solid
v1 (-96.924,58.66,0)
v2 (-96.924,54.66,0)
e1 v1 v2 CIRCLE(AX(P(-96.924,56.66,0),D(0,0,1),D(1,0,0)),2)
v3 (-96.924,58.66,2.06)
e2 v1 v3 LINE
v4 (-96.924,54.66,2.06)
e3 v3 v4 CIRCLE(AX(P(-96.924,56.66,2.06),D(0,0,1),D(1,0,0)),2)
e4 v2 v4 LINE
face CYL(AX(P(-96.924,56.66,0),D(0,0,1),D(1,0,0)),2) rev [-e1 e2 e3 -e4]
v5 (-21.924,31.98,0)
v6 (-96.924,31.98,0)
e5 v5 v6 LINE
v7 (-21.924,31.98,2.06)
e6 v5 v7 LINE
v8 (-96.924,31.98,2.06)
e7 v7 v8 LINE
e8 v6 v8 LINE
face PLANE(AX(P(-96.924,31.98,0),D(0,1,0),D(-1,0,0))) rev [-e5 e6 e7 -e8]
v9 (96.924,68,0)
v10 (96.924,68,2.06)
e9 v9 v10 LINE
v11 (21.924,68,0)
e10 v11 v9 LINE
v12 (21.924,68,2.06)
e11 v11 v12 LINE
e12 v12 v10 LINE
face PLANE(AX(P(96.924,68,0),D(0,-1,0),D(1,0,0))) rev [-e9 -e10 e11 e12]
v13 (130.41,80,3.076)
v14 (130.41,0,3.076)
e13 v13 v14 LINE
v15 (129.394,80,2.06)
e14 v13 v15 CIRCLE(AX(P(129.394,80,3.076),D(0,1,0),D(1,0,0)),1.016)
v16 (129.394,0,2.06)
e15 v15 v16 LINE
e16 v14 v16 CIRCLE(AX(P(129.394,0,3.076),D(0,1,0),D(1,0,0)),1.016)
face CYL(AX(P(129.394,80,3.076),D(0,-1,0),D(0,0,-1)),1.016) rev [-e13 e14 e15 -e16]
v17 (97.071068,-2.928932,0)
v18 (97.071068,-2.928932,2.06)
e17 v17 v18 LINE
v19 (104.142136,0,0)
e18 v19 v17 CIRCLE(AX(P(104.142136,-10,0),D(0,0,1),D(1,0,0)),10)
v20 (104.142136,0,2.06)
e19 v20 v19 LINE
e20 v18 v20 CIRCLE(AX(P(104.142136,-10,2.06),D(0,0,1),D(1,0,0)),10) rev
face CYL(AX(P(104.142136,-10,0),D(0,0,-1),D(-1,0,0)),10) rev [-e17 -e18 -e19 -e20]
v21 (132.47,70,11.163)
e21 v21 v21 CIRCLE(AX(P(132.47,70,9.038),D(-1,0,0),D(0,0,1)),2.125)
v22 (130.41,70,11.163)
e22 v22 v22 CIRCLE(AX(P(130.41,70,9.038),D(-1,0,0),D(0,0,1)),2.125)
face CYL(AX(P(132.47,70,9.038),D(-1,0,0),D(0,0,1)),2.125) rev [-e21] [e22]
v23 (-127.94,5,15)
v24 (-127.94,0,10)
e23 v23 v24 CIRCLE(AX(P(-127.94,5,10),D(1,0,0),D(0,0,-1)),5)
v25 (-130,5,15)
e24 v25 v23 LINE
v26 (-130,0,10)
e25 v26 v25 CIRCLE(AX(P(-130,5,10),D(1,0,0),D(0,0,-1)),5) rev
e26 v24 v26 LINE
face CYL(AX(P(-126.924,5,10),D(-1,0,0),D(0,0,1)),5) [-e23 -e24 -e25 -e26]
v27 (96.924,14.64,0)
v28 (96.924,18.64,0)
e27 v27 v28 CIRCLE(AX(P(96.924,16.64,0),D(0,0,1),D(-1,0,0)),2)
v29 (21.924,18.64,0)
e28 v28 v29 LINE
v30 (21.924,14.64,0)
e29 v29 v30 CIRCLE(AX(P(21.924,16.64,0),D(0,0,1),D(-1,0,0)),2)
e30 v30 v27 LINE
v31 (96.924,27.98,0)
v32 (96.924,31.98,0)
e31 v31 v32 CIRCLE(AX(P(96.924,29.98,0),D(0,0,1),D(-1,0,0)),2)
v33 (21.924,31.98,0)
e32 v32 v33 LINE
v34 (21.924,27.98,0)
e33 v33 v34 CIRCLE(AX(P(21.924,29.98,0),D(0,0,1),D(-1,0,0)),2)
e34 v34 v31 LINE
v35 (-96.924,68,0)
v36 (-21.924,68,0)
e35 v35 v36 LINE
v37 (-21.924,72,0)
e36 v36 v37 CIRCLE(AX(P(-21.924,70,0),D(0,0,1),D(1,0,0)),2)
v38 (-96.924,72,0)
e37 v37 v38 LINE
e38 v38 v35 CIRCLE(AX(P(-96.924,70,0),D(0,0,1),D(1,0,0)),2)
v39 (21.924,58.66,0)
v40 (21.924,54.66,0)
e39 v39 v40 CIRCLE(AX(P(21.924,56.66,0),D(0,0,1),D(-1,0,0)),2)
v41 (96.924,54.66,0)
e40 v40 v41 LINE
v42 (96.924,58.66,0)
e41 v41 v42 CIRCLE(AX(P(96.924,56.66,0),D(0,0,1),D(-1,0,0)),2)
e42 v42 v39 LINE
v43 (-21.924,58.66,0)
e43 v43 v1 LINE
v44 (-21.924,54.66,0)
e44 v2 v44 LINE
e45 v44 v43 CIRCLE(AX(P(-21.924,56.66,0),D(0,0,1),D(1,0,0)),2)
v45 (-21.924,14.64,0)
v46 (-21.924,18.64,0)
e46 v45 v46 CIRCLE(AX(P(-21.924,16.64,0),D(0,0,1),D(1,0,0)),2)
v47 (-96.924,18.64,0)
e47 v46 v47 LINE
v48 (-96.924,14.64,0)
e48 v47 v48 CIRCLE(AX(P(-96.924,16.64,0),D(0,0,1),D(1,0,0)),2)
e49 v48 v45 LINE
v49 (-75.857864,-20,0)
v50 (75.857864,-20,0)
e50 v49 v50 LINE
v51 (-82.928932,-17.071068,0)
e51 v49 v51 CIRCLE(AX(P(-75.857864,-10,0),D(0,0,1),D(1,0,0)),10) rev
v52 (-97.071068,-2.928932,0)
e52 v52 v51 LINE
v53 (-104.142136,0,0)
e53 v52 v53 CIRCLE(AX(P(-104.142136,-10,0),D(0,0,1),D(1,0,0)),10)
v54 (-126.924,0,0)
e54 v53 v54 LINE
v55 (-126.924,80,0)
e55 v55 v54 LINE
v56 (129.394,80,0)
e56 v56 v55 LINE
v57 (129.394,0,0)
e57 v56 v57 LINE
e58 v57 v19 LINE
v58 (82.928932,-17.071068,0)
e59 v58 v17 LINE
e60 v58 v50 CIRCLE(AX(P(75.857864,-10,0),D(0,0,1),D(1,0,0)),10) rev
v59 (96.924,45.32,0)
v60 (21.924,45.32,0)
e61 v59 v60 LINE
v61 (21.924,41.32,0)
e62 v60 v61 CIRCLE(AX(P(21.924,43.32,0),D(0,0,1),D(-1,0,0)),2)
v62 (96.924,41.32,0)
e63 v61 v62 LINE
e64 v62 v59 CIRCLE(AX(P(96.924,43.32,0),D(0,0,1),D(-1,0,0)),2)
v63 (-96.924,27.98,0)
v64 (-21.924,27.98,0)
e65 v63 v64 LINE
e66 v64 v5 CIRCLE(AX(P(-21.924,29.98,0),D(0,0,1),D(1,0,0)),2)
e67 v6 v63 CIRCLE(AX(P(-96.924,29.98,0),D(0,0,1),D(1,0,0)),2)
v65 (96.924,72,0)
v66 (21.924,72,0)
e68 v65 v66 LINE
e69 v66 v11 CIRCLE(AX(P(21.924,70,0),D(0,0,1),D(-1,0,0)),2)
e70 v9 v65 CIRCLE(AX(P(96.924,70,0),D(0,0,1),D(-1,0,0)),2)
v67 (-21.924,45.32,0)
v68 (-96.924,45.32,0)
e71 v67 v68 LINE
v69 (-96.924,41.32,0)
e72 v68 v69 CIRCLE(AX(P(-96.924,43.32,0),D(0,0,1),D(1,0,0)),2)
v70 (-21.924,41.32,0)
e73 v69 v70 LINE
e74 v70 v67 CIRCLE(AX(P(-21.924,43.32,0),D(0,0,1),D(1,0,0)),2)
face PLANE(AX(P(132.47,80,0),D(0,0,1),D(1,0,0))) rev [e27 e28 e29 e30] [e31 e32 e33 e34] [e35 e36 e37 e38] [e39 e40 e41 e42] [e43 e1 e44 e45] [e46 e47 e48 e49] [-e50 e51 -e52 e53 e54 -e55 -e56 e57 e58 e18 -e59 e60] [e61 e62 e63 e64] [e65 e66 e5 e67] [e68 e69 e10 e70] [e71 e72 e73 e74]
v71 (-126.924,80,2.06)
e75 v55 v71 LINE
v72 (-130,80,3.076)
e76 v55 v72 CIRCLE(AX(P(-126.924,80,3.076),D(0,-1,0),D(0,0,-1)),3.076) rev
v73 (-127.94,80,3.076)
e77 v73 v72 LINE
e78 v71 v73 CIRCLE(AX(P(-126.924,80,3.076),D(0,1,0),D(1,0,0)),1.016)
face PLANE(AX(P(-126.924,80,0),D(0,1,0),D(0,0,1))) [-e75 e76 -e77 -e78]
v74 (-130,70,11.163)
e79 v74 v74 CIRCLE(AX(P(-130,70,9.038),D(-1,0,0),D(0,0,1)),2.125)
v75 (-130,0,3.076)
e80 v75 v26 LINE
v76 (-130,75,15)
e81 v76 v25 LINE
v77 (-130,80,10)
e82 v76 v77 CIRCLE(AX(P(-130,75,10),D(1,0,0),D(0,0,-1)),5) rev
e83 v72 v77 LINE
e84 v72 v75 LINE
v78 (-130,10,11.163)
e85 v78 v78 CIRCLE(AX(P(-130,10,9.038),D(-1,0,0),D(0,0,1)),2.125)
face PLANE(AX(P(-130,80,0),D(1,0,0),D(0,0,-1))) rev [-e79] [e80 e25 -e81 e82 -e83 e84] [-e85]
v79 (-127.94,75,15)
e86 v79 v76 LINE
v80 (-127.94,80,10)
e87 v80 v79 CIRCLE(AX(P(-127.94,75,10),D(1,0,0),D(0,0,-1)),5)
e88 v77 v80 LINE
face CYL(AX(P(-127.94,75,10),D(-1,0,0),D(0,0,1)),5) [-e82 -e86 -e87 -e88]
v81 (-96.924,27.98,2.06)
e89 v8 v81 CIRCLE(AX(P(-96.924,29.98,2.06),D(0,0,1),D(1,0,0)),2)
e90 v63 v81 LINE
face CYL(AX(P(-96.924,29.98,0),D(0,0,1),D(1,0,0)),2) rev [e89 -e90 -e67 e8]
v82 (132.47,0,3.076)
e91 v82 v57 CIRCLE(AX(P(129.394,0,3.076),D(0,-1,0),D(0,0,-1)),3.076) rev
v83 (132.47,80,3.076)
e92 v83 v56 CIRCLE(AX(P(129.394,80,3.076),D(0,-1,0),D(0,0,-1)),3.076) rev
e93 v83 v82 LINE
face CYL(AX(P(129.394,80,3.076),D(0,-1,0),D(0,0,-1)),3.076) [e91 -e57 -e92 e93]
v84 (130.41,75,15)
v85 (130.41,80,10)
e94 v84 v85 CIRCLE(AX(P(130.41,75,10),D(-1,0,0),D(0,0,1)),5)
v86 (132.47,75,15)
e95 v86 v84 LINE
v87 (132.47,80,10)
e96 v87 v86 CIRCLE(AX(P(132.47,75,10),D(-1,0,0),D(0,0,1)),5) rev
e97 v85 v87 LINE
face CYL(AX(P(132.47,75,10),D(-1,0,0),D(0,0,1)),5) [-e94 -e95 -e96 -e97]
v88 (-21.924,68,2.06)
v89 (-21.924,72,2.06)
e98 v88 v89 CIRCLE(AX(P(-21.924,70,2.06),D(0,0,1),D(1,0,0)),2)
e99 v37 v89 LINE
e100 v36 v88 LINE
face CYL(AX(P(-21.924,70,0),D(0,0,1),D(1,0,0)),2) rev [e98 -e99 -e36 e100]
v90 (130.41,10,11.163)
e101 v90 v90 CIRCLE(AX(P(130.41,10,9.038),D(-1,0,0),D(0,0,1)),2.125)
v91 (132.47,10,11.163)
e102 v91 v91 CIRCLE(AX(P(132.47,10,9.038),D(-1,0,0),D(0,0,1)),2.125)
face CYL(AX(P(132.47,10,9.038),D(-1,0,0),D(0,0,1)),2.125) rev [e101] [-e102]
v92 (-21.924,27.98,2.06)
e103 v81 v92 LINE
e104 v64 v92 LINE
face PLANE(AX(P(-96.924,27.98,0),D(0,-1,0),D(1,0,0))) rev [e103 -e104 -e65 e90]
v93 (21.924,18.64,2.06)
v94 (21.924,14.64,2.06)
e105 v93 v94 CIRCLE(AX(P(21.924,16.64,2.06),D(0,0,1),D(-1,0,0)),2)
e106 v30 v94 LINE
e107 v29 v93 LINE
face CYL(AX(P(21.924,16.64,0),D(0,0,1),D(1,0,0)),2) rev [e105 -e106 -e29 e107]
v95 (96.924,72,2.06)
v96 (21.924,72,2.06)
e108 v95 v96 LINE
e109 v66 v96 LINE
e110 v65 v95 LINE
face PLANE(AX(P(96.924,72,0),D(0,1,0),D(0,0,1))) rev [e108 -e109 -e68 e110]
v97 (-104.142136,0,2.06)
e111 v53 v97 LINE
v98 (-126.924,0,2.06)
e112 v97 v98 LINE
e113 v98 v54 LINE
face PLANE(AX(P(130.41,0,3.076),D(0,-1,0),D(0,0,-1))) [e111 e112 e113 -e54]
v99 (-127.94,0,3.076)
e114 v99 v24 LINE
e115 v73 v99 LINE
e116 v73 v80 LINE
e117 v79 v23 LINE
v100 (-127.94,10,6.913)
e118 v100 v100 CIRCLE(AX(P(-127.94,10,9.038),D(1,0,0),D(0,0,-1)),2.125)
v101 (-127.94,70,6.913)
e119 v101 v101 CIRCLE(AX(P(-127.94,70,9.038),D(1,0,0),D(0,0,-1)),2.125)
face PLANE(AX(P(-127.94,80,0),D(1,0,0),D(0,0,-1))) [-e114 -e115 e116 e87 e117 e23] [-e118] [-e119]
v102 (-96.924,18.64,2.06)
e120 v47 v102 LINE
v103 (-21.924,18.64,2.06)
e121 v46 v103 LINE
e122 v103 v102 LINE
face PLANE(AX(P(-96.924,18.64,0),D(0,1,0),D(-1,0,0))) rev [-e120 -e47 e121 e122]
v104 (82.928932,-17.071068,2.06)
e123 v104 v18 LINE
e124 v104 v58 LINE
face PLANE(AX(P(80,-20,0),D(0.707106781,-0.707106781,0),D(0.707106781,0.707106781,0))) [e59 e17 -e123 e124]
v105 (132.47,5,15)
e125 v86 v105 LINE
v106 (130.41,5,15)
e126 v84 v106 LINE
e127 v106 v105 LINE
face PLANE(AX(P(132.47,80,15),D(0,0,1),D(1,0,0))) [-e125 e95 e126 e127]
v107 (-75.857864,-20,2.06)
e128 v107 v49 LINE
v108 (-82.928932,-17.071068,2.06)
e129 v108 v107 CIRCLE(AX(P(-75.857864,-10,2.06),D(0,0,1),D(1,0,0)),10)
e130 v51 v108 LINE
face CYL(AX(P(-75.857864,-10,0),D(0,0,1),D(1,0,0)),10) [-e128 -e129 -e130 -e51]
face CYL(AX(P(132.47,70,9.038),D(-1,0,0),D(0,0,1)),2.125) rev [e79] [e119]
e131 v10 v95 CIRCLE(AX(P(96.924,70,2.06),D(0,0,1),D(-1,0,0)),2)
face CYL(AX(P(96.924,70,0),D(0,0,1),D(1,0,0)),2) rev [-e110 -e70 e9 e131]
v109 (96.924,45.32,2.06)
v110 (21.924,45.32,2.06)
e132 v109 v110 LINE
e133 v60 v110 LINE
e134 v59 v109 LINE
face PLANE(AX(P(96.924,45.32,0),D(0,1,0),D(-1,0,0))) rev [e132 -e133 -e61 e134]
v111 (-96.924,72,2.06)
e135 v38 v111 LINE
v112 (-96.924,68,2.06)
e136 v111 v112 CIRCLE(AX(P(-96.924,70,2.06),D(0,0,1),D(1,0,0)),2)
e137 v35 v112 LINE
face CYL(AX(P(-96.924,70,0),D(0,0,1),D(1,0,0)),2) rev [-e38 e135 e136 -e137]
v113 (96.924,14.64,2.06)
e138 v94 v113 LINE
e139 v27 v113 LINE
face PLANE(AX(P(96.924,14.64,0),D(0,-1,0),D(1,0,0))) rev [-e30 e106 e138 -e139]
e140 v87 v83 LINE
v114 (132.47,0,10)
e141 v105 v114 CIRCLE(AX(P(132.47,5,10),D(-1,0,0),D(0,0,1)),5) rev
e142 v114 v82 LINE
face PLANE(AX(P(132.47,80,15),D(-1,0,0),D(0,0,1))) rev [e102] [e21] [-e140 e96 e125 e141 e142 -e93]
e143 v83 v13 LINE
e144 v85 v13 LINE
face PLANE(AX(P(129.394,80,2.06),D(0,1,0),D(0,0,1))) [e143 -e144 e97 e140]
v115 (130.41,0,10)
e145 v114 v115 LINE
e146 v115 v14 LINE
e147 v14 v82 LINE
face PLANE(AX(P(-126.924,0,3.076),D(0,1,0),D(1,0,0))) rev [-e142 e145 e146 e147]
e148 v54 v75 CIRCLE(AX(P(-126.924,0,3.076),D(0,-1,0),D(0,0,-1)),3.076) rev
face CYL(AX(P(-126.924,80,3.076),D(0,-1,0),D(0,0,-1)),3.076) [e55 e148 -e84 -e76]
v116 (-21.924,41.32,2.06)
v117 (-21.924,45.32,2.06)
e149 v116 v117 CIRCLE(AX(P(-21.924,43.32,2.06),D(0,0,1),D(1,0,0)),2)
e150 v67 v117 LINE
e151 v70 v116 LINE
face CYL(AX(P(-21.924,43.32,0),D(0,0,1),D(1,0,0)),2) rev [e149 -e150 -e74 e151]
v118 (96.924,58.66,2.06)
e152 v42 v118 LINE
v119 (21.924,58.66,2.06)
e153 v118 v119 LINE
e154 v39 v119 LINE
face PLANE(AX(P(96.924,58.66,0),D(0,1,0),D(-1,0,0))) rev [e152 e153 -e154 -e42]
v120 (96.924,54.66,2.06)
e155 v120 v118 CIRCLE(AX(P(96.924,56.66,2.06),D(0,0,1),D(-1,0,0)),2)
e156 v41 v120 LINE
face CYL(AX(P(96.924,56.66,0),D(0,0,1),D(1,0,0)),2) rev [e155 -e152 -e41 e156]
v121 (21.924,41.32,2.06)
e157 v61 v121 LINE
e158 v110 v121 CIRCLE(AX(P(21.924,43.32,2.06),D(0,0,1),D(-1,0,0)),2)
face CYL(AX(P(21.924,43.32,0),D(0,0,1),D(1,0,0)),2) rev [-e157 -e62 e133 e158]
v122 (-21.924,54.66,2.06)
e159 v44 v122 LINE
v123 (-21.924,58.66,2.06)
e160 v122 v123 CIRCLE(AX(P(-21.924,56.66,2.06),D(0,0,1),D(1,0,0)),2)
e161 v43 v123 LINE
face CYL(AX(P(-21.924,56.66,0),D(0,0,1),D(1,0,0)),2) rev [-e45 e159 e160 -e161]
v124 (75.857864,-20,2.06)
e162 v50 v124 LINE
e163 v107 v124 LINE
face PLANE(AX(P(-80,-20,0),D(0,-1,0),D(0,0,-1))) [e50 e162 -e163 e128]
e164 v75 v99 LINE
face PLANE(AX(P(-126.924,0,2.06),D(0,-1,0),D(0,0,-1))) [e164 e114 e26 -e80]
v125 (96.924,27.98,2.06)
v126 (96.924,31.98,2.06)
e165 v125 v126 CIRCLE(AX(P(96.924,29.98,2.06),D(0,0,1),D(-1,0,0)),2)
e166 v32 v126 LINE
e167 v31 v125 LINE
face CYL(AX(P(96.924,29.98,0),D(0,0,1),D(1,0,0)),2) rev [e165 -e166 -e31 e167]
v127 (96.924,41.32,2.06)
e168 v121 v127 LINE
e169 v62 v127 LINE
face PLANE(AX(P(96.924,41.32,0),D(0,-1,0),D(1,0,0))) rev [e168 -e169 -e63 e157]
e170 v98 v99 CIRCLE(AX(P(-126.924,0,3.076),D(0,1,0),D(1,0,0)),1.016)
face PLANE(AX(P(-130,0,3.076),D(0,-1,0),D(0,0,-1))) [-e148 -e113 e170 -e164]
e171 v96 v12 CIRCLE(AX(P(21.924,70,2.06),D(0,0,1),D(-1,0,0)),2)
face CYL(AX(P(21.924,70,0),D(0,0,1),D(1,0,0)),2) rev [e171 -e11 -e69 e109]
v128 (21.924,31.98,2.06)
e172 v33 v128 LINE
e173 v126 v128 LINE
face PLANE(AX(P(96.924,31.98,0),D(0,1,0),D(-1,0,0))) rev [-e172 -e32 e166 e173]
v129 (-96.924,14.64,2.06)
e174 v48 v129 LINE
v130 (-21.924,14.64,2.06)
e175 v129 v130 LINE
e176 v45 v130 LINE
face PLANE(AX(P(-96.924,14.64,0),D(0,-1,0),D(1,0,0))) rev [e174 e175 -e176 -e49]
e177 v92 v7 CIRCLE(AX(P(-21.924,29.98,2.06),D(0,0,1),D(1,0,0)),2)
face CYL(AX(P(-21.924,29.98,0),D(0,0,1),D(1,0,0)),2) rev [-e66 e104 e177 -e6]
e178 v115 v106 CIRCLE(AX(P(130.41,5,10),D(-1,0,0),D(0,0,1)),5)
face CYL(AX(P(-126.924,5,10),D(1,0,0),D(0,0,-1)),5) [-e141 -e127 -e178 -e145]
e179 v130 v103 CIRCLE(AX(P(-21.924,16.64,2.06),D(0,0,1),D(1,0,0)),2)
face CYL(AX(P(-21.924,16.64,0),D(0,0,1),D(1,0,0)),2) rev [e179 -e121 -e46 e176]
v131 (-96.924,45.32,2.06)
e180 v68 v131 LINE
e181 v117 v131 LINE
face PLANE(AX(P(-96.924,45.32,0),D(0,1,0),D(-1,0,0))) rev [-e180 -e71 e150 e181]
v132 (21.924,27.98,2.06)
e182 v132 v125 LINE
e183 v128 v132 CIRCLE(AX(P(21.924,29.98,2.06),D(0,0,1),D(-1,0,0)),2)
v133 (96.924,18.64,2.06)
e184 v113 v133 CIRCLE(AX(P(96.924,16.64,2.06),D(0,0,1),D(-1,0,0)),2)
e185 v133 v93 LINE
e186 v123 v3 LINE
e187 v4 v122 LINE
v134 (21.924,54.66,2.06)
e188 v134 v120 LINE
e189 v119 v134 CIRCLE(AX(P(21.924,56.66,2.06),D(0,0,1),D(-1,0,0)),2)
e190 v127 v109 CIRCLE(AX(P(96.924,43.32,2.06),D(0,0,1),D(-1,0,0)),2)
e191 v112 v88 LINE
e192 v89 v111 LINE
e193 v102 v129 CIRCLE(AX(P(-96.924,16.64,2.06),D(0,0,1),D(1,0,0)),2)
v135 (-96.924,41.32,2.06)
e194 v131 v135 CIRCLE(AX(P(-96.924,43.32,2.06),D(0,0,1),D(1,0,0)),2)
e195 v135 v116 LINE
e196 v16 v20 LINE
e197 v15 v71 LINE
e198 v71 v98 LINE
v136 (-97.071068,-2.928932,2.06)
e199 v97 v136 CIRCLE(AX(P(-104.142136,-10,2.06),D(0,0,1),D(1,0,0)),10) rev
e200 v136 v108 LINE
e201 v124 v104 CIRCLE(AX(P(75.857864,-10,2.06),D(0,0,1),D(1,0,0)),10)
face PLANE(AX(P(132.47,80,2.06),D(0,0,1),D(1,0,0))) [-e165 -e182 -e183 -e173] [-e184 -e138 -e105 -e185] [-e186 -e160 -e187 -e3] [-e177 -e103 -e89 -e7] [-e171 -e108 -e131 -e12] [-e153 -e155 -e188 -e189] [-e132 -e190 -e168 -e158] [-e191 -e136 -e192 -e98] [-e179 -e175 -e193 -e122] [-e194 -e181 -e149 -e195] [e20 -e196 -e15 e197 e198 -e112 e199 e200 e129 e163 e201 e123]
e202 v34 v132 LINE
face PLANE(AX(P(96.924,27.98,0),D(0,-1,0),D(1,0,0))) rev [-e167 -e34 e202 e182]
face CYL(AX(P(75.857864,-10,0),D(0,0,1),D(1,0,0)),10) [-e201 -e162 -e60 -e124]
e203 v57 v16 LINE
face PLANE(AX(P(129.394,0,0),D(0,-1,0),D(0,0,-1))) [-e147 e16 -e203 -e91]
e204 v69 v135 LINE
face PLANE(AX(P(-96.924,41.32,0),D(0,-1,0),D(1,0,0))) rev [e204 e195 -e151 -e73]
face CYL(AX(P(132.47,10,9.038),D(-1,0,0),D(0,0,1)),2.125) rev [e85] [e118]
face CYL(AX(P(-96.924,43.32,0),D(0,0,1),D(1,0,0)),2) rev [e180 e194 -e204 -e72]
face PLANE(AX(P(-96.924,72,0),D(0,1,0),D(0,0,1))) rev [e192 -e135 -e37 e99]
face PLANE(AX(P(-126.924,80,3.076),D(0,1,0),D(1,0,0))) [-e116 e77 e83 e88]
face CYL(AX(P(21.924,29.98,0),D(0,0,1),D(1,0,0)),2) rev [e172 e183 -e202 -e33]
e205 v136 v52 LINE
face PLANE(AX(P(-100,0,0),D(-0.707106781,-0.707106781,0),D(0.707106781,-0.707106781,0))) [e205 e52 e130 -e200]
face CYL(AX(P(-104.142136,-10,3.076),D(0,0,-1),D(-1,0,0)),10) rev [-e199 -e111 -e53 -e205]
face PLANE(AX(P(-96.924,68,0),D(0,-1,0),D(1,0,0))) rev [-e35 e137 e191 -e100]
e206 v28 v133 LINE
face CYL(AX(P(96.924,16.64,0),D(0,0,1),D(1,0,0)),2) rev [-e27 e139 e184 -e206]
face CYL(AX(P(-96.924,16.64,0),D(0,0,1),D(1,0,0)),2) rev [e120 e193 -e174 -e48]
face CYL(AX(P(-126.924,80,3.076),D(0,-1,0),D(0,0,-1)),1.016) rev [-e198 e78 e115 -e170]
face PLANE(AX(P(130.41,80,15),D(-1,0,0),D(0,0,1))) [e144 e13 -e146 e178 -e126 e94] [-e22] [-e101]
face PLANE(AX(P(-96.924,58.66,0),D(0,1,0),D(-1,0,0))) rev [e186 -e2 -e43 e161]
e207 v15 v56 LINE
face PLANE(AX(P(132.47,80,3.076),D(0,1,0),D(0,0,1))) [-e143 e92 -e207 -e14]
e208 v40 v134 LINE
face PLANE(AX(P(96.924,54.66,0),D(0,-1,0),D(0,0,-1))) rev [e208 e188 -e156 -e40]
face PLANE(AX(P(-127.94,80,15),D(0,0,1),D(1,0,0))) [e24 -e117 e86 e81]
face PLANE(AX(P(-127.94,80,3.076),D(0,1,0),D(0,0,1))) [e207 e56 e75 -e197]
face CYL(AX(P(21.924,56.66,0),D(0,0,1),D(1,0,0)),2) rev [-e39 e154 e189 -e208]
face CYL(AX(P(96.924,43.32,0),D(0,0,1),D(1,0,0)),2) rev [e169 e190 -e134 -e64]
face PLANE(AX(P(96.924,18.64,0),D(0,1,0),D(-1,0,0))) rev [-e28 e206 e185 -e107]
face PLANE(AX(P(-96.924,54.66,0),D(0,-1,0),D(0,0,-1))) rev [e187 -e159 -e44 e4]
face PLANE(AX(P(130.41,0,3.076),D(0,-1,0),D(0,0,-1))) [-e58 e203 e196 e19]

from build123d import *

# Parameters (mm, degrees)
BASE_FLANGE1_DEPTH  = 80
SKETCH6_R           = 2.125
CUT_EXTRUDE1_DEPTH  = 275.800838609
FILLET1_R           = 5
BOSS_EXTRUDE1_DEPTH = 2.06
FILLET2_R           = 10
CUT_EXTRUDE2_DEPTH  = 10


# Read off the part's stored shape, not the designer's step: Base-Flange1
with BuildPart() as part:
    # Base-Flange1 outline → Base-Flange1 (new body)
    with BuildSketch(Plane(origin=(0, 0, 0), x_dir=(1, 0, 0), z_dir=(0, 1, 0))):
        with BuildLine():
            Line((-130, -3.076), (-130, -15))
            Line((-130, -15), (-127.94, -15))
            Line((-127.94, -15), (-127.94, -3.076))
            ThreePointArc((-127.94, -3.076), (-127.64242049, -2.35757951), (-126.924, -2.06))
            Line((-126.924, -2.06), (129.394, -2.06))
            ThreePointArc((129.394, -2.06), (130.11242049, -2.35757951), (130.41, -3.076))
            Line((130.41, -3.076), (130.41, -15))
            Line((130.41, -15), (132.47, -15))
            Line((132.47, -15), (132.47, -3.076))
            ThreePointArc((132.47, -3.076), (131.569060459, -0.900939541), (129.394, 0))
            Line((129.394, 0), (-126.924, 0))
            ThreePointArc((-126.924, 0), (-129.099060459, -0.900939541), (-130, -3.076))
        make_face()
    extrude(amount=BASE_FLANGE1_DEPTH)

    # Sketch6 → Cut-Extrude1 (cut, through all)
    with BuildSketch(Plane.ZY.offset(130)):
        with Locations((9.038, 70)):
            Circle(SKETCH6_R)
        with Locations((9.038, 10)):
            Circle(SKETCH6_R)
    extrude(amount=-CUT_EXTRUDE1_DEPTH, mode=Mode.SUBTRACT)

    # Fillet1
    fillet1_edges = [part.edges().sort_by_distance(p)[0] for p in [
        (131.44, 0, 15),
        (-128.97, 0, 15),
        (131.44, 80, 15),
        (-128.97, 80, 15),
    ]]
    fillet(fillet1_edges, radius=FILLET1_R)

    # Sketch7 → Boss-Extrude1 (add)
    with BuildSketch(Plane.XY.offset(2.06)):
        Polygon((-100, 0), (-80, -20), (80, -20), (100, 0), align=None)
    extrude(amount=-BOSS_EXTRUDE1_DEPTH)

    # Fillet2
    fillet2_edges = [part.edges().sort_by_distance(p)[0] for p in [
        (-100, 0, 1.03),
        (100, 0, 1.03),
        (80, -20, 1.03),
        (-80, -20, 1.03),
    ]]
    fillet(fillet2_edges, radius=FILLET2_R)

    # Sketch8 → Cut-Extrude2 (cut)
    with BuildSketch(Plane.XY.offset(2.06)):
        with BuildLine():
            Line((-96.924, 72), (-21.924, 72))
            ThreePointArc((-21.924, 72), (-19.924, 70), (-21.924, 68))
            Line((-21.924, 68), (-96.924, 68))
            ThreePointArc((-96.924, 68), (-98.924, 70), (-96.924, 72))
        make_face()
        with BuildLine():
            Line((-96.924, 58.66), (-21.924, 58.66))
            ThreePointArc((-21.924, 58.66), (-19.924, 56.66), (-21.924, 54.66))
            Line((-21.924, 54.66), (-96.924, 54.66))
            ThreePointArc((-96.924, 54.66), (-98.924, 56.66), (-96.924, 58.66))
        make_face()
        with BuildLine():
            Line((-96.924, 45.32), (-21.924, 45.32))
            ThreePointArc((-21.924, 45.32), (-19.924, 43.32), (-21.924, 41.32))
            Line((-21.924, 41.32), (-96.924, 41.32))
            ThreePointArc((-96.924, 41.32), (-98.924, 43.32), (-96.924, 45.32))
        make_face()
        with BuildLine():
            Line((-96.924, 31.98), (-21.924, 31.98))
            ThreePointArc((-21.924, 31.98), (-19.924, 29.98), (-21.924, 27.98))
            Line((-21.924, 27.98), (-96.924, 27.98))
            ThreePointArc((-96.924, 27.98), (-98.924, 29.98), (-96.924, 31.98))
        make_face()
        with BuildLine():
            Line((-96.924, 18.64), (-21.924, 18.64))
            ThreePointArc((-21.924, 18.64), (-19.924, 16.64), (-21.924, 14.64))
            Line((-21.924, 14.64), (-96.924, 14.64))
            ThreePointArc((-96.924, 14.64), (-98.924, 16.64), (-96.924, 18.64))
        make_face()
        with BuildLine():
            Line((96.924, 72), (21.924, 72))
            ThreePointArc((21.924, 72), (19.924, 70), (21.924, 68))
            Line((21.924, 68), (96.924, 68))
            ThreePointArc((96.924, 68), (98.924, 70), (96.924, 72))
        make_face()
        with BuildLine():
            Line((96.924, 58.66), (21.924, 58.66))
            ThreePointArc((21.924, 58.66), (19.924, 56.66), (21.924, 54.66))
            Line((21.924, 54.66), (96.924, 54.66))
            ThreePointArc((96.924, 54.66), (98.924, 56.66), (96.924, 58.66))
        make_face()
        with BuildLine():
            Line((96.924, 45.32), (21.924, 45.32))
            ThreePointArc((21.924, 45.32), (19.924, 43.32), (21.924, 41.32))
            Line((21.924, 41.32), (96.924, 41.32))
            ThreePointArc((96.924, 41.32), (98.924, 43.32), (96.924, 45.32))
        make_face()
        with BuildLine():
            Line((96.924, 31.98), (21.924, 31.98))
            ThreePointArc((21.924, 31.98), (19.924, 29.98), (21.924, 27.98))
            Line((21.924, 27.98), (96.924, 27.98))
            ThreePointArc((96.924, 27.98), (98.924, 29.98), (96.924, 31.98))
        make_face()
        with BuildLine():
            Line((96.924, 18.64), (21.924, 18.64))
            ThreePointArc((21.924, 18.64), (19.924, 16.64), (21.924, 14.64))
            Line((21.924, 14.64), (96.924, 14.64))
            ThreePointArc((96.924, 14.64), (98.924, 16.64), (96.924, 18.64))
        make_face()
    extrude(amount=-CUT_EXTRUDE2_DEPTH, mode=Mode.SUBTRACT)


solid = part.part
